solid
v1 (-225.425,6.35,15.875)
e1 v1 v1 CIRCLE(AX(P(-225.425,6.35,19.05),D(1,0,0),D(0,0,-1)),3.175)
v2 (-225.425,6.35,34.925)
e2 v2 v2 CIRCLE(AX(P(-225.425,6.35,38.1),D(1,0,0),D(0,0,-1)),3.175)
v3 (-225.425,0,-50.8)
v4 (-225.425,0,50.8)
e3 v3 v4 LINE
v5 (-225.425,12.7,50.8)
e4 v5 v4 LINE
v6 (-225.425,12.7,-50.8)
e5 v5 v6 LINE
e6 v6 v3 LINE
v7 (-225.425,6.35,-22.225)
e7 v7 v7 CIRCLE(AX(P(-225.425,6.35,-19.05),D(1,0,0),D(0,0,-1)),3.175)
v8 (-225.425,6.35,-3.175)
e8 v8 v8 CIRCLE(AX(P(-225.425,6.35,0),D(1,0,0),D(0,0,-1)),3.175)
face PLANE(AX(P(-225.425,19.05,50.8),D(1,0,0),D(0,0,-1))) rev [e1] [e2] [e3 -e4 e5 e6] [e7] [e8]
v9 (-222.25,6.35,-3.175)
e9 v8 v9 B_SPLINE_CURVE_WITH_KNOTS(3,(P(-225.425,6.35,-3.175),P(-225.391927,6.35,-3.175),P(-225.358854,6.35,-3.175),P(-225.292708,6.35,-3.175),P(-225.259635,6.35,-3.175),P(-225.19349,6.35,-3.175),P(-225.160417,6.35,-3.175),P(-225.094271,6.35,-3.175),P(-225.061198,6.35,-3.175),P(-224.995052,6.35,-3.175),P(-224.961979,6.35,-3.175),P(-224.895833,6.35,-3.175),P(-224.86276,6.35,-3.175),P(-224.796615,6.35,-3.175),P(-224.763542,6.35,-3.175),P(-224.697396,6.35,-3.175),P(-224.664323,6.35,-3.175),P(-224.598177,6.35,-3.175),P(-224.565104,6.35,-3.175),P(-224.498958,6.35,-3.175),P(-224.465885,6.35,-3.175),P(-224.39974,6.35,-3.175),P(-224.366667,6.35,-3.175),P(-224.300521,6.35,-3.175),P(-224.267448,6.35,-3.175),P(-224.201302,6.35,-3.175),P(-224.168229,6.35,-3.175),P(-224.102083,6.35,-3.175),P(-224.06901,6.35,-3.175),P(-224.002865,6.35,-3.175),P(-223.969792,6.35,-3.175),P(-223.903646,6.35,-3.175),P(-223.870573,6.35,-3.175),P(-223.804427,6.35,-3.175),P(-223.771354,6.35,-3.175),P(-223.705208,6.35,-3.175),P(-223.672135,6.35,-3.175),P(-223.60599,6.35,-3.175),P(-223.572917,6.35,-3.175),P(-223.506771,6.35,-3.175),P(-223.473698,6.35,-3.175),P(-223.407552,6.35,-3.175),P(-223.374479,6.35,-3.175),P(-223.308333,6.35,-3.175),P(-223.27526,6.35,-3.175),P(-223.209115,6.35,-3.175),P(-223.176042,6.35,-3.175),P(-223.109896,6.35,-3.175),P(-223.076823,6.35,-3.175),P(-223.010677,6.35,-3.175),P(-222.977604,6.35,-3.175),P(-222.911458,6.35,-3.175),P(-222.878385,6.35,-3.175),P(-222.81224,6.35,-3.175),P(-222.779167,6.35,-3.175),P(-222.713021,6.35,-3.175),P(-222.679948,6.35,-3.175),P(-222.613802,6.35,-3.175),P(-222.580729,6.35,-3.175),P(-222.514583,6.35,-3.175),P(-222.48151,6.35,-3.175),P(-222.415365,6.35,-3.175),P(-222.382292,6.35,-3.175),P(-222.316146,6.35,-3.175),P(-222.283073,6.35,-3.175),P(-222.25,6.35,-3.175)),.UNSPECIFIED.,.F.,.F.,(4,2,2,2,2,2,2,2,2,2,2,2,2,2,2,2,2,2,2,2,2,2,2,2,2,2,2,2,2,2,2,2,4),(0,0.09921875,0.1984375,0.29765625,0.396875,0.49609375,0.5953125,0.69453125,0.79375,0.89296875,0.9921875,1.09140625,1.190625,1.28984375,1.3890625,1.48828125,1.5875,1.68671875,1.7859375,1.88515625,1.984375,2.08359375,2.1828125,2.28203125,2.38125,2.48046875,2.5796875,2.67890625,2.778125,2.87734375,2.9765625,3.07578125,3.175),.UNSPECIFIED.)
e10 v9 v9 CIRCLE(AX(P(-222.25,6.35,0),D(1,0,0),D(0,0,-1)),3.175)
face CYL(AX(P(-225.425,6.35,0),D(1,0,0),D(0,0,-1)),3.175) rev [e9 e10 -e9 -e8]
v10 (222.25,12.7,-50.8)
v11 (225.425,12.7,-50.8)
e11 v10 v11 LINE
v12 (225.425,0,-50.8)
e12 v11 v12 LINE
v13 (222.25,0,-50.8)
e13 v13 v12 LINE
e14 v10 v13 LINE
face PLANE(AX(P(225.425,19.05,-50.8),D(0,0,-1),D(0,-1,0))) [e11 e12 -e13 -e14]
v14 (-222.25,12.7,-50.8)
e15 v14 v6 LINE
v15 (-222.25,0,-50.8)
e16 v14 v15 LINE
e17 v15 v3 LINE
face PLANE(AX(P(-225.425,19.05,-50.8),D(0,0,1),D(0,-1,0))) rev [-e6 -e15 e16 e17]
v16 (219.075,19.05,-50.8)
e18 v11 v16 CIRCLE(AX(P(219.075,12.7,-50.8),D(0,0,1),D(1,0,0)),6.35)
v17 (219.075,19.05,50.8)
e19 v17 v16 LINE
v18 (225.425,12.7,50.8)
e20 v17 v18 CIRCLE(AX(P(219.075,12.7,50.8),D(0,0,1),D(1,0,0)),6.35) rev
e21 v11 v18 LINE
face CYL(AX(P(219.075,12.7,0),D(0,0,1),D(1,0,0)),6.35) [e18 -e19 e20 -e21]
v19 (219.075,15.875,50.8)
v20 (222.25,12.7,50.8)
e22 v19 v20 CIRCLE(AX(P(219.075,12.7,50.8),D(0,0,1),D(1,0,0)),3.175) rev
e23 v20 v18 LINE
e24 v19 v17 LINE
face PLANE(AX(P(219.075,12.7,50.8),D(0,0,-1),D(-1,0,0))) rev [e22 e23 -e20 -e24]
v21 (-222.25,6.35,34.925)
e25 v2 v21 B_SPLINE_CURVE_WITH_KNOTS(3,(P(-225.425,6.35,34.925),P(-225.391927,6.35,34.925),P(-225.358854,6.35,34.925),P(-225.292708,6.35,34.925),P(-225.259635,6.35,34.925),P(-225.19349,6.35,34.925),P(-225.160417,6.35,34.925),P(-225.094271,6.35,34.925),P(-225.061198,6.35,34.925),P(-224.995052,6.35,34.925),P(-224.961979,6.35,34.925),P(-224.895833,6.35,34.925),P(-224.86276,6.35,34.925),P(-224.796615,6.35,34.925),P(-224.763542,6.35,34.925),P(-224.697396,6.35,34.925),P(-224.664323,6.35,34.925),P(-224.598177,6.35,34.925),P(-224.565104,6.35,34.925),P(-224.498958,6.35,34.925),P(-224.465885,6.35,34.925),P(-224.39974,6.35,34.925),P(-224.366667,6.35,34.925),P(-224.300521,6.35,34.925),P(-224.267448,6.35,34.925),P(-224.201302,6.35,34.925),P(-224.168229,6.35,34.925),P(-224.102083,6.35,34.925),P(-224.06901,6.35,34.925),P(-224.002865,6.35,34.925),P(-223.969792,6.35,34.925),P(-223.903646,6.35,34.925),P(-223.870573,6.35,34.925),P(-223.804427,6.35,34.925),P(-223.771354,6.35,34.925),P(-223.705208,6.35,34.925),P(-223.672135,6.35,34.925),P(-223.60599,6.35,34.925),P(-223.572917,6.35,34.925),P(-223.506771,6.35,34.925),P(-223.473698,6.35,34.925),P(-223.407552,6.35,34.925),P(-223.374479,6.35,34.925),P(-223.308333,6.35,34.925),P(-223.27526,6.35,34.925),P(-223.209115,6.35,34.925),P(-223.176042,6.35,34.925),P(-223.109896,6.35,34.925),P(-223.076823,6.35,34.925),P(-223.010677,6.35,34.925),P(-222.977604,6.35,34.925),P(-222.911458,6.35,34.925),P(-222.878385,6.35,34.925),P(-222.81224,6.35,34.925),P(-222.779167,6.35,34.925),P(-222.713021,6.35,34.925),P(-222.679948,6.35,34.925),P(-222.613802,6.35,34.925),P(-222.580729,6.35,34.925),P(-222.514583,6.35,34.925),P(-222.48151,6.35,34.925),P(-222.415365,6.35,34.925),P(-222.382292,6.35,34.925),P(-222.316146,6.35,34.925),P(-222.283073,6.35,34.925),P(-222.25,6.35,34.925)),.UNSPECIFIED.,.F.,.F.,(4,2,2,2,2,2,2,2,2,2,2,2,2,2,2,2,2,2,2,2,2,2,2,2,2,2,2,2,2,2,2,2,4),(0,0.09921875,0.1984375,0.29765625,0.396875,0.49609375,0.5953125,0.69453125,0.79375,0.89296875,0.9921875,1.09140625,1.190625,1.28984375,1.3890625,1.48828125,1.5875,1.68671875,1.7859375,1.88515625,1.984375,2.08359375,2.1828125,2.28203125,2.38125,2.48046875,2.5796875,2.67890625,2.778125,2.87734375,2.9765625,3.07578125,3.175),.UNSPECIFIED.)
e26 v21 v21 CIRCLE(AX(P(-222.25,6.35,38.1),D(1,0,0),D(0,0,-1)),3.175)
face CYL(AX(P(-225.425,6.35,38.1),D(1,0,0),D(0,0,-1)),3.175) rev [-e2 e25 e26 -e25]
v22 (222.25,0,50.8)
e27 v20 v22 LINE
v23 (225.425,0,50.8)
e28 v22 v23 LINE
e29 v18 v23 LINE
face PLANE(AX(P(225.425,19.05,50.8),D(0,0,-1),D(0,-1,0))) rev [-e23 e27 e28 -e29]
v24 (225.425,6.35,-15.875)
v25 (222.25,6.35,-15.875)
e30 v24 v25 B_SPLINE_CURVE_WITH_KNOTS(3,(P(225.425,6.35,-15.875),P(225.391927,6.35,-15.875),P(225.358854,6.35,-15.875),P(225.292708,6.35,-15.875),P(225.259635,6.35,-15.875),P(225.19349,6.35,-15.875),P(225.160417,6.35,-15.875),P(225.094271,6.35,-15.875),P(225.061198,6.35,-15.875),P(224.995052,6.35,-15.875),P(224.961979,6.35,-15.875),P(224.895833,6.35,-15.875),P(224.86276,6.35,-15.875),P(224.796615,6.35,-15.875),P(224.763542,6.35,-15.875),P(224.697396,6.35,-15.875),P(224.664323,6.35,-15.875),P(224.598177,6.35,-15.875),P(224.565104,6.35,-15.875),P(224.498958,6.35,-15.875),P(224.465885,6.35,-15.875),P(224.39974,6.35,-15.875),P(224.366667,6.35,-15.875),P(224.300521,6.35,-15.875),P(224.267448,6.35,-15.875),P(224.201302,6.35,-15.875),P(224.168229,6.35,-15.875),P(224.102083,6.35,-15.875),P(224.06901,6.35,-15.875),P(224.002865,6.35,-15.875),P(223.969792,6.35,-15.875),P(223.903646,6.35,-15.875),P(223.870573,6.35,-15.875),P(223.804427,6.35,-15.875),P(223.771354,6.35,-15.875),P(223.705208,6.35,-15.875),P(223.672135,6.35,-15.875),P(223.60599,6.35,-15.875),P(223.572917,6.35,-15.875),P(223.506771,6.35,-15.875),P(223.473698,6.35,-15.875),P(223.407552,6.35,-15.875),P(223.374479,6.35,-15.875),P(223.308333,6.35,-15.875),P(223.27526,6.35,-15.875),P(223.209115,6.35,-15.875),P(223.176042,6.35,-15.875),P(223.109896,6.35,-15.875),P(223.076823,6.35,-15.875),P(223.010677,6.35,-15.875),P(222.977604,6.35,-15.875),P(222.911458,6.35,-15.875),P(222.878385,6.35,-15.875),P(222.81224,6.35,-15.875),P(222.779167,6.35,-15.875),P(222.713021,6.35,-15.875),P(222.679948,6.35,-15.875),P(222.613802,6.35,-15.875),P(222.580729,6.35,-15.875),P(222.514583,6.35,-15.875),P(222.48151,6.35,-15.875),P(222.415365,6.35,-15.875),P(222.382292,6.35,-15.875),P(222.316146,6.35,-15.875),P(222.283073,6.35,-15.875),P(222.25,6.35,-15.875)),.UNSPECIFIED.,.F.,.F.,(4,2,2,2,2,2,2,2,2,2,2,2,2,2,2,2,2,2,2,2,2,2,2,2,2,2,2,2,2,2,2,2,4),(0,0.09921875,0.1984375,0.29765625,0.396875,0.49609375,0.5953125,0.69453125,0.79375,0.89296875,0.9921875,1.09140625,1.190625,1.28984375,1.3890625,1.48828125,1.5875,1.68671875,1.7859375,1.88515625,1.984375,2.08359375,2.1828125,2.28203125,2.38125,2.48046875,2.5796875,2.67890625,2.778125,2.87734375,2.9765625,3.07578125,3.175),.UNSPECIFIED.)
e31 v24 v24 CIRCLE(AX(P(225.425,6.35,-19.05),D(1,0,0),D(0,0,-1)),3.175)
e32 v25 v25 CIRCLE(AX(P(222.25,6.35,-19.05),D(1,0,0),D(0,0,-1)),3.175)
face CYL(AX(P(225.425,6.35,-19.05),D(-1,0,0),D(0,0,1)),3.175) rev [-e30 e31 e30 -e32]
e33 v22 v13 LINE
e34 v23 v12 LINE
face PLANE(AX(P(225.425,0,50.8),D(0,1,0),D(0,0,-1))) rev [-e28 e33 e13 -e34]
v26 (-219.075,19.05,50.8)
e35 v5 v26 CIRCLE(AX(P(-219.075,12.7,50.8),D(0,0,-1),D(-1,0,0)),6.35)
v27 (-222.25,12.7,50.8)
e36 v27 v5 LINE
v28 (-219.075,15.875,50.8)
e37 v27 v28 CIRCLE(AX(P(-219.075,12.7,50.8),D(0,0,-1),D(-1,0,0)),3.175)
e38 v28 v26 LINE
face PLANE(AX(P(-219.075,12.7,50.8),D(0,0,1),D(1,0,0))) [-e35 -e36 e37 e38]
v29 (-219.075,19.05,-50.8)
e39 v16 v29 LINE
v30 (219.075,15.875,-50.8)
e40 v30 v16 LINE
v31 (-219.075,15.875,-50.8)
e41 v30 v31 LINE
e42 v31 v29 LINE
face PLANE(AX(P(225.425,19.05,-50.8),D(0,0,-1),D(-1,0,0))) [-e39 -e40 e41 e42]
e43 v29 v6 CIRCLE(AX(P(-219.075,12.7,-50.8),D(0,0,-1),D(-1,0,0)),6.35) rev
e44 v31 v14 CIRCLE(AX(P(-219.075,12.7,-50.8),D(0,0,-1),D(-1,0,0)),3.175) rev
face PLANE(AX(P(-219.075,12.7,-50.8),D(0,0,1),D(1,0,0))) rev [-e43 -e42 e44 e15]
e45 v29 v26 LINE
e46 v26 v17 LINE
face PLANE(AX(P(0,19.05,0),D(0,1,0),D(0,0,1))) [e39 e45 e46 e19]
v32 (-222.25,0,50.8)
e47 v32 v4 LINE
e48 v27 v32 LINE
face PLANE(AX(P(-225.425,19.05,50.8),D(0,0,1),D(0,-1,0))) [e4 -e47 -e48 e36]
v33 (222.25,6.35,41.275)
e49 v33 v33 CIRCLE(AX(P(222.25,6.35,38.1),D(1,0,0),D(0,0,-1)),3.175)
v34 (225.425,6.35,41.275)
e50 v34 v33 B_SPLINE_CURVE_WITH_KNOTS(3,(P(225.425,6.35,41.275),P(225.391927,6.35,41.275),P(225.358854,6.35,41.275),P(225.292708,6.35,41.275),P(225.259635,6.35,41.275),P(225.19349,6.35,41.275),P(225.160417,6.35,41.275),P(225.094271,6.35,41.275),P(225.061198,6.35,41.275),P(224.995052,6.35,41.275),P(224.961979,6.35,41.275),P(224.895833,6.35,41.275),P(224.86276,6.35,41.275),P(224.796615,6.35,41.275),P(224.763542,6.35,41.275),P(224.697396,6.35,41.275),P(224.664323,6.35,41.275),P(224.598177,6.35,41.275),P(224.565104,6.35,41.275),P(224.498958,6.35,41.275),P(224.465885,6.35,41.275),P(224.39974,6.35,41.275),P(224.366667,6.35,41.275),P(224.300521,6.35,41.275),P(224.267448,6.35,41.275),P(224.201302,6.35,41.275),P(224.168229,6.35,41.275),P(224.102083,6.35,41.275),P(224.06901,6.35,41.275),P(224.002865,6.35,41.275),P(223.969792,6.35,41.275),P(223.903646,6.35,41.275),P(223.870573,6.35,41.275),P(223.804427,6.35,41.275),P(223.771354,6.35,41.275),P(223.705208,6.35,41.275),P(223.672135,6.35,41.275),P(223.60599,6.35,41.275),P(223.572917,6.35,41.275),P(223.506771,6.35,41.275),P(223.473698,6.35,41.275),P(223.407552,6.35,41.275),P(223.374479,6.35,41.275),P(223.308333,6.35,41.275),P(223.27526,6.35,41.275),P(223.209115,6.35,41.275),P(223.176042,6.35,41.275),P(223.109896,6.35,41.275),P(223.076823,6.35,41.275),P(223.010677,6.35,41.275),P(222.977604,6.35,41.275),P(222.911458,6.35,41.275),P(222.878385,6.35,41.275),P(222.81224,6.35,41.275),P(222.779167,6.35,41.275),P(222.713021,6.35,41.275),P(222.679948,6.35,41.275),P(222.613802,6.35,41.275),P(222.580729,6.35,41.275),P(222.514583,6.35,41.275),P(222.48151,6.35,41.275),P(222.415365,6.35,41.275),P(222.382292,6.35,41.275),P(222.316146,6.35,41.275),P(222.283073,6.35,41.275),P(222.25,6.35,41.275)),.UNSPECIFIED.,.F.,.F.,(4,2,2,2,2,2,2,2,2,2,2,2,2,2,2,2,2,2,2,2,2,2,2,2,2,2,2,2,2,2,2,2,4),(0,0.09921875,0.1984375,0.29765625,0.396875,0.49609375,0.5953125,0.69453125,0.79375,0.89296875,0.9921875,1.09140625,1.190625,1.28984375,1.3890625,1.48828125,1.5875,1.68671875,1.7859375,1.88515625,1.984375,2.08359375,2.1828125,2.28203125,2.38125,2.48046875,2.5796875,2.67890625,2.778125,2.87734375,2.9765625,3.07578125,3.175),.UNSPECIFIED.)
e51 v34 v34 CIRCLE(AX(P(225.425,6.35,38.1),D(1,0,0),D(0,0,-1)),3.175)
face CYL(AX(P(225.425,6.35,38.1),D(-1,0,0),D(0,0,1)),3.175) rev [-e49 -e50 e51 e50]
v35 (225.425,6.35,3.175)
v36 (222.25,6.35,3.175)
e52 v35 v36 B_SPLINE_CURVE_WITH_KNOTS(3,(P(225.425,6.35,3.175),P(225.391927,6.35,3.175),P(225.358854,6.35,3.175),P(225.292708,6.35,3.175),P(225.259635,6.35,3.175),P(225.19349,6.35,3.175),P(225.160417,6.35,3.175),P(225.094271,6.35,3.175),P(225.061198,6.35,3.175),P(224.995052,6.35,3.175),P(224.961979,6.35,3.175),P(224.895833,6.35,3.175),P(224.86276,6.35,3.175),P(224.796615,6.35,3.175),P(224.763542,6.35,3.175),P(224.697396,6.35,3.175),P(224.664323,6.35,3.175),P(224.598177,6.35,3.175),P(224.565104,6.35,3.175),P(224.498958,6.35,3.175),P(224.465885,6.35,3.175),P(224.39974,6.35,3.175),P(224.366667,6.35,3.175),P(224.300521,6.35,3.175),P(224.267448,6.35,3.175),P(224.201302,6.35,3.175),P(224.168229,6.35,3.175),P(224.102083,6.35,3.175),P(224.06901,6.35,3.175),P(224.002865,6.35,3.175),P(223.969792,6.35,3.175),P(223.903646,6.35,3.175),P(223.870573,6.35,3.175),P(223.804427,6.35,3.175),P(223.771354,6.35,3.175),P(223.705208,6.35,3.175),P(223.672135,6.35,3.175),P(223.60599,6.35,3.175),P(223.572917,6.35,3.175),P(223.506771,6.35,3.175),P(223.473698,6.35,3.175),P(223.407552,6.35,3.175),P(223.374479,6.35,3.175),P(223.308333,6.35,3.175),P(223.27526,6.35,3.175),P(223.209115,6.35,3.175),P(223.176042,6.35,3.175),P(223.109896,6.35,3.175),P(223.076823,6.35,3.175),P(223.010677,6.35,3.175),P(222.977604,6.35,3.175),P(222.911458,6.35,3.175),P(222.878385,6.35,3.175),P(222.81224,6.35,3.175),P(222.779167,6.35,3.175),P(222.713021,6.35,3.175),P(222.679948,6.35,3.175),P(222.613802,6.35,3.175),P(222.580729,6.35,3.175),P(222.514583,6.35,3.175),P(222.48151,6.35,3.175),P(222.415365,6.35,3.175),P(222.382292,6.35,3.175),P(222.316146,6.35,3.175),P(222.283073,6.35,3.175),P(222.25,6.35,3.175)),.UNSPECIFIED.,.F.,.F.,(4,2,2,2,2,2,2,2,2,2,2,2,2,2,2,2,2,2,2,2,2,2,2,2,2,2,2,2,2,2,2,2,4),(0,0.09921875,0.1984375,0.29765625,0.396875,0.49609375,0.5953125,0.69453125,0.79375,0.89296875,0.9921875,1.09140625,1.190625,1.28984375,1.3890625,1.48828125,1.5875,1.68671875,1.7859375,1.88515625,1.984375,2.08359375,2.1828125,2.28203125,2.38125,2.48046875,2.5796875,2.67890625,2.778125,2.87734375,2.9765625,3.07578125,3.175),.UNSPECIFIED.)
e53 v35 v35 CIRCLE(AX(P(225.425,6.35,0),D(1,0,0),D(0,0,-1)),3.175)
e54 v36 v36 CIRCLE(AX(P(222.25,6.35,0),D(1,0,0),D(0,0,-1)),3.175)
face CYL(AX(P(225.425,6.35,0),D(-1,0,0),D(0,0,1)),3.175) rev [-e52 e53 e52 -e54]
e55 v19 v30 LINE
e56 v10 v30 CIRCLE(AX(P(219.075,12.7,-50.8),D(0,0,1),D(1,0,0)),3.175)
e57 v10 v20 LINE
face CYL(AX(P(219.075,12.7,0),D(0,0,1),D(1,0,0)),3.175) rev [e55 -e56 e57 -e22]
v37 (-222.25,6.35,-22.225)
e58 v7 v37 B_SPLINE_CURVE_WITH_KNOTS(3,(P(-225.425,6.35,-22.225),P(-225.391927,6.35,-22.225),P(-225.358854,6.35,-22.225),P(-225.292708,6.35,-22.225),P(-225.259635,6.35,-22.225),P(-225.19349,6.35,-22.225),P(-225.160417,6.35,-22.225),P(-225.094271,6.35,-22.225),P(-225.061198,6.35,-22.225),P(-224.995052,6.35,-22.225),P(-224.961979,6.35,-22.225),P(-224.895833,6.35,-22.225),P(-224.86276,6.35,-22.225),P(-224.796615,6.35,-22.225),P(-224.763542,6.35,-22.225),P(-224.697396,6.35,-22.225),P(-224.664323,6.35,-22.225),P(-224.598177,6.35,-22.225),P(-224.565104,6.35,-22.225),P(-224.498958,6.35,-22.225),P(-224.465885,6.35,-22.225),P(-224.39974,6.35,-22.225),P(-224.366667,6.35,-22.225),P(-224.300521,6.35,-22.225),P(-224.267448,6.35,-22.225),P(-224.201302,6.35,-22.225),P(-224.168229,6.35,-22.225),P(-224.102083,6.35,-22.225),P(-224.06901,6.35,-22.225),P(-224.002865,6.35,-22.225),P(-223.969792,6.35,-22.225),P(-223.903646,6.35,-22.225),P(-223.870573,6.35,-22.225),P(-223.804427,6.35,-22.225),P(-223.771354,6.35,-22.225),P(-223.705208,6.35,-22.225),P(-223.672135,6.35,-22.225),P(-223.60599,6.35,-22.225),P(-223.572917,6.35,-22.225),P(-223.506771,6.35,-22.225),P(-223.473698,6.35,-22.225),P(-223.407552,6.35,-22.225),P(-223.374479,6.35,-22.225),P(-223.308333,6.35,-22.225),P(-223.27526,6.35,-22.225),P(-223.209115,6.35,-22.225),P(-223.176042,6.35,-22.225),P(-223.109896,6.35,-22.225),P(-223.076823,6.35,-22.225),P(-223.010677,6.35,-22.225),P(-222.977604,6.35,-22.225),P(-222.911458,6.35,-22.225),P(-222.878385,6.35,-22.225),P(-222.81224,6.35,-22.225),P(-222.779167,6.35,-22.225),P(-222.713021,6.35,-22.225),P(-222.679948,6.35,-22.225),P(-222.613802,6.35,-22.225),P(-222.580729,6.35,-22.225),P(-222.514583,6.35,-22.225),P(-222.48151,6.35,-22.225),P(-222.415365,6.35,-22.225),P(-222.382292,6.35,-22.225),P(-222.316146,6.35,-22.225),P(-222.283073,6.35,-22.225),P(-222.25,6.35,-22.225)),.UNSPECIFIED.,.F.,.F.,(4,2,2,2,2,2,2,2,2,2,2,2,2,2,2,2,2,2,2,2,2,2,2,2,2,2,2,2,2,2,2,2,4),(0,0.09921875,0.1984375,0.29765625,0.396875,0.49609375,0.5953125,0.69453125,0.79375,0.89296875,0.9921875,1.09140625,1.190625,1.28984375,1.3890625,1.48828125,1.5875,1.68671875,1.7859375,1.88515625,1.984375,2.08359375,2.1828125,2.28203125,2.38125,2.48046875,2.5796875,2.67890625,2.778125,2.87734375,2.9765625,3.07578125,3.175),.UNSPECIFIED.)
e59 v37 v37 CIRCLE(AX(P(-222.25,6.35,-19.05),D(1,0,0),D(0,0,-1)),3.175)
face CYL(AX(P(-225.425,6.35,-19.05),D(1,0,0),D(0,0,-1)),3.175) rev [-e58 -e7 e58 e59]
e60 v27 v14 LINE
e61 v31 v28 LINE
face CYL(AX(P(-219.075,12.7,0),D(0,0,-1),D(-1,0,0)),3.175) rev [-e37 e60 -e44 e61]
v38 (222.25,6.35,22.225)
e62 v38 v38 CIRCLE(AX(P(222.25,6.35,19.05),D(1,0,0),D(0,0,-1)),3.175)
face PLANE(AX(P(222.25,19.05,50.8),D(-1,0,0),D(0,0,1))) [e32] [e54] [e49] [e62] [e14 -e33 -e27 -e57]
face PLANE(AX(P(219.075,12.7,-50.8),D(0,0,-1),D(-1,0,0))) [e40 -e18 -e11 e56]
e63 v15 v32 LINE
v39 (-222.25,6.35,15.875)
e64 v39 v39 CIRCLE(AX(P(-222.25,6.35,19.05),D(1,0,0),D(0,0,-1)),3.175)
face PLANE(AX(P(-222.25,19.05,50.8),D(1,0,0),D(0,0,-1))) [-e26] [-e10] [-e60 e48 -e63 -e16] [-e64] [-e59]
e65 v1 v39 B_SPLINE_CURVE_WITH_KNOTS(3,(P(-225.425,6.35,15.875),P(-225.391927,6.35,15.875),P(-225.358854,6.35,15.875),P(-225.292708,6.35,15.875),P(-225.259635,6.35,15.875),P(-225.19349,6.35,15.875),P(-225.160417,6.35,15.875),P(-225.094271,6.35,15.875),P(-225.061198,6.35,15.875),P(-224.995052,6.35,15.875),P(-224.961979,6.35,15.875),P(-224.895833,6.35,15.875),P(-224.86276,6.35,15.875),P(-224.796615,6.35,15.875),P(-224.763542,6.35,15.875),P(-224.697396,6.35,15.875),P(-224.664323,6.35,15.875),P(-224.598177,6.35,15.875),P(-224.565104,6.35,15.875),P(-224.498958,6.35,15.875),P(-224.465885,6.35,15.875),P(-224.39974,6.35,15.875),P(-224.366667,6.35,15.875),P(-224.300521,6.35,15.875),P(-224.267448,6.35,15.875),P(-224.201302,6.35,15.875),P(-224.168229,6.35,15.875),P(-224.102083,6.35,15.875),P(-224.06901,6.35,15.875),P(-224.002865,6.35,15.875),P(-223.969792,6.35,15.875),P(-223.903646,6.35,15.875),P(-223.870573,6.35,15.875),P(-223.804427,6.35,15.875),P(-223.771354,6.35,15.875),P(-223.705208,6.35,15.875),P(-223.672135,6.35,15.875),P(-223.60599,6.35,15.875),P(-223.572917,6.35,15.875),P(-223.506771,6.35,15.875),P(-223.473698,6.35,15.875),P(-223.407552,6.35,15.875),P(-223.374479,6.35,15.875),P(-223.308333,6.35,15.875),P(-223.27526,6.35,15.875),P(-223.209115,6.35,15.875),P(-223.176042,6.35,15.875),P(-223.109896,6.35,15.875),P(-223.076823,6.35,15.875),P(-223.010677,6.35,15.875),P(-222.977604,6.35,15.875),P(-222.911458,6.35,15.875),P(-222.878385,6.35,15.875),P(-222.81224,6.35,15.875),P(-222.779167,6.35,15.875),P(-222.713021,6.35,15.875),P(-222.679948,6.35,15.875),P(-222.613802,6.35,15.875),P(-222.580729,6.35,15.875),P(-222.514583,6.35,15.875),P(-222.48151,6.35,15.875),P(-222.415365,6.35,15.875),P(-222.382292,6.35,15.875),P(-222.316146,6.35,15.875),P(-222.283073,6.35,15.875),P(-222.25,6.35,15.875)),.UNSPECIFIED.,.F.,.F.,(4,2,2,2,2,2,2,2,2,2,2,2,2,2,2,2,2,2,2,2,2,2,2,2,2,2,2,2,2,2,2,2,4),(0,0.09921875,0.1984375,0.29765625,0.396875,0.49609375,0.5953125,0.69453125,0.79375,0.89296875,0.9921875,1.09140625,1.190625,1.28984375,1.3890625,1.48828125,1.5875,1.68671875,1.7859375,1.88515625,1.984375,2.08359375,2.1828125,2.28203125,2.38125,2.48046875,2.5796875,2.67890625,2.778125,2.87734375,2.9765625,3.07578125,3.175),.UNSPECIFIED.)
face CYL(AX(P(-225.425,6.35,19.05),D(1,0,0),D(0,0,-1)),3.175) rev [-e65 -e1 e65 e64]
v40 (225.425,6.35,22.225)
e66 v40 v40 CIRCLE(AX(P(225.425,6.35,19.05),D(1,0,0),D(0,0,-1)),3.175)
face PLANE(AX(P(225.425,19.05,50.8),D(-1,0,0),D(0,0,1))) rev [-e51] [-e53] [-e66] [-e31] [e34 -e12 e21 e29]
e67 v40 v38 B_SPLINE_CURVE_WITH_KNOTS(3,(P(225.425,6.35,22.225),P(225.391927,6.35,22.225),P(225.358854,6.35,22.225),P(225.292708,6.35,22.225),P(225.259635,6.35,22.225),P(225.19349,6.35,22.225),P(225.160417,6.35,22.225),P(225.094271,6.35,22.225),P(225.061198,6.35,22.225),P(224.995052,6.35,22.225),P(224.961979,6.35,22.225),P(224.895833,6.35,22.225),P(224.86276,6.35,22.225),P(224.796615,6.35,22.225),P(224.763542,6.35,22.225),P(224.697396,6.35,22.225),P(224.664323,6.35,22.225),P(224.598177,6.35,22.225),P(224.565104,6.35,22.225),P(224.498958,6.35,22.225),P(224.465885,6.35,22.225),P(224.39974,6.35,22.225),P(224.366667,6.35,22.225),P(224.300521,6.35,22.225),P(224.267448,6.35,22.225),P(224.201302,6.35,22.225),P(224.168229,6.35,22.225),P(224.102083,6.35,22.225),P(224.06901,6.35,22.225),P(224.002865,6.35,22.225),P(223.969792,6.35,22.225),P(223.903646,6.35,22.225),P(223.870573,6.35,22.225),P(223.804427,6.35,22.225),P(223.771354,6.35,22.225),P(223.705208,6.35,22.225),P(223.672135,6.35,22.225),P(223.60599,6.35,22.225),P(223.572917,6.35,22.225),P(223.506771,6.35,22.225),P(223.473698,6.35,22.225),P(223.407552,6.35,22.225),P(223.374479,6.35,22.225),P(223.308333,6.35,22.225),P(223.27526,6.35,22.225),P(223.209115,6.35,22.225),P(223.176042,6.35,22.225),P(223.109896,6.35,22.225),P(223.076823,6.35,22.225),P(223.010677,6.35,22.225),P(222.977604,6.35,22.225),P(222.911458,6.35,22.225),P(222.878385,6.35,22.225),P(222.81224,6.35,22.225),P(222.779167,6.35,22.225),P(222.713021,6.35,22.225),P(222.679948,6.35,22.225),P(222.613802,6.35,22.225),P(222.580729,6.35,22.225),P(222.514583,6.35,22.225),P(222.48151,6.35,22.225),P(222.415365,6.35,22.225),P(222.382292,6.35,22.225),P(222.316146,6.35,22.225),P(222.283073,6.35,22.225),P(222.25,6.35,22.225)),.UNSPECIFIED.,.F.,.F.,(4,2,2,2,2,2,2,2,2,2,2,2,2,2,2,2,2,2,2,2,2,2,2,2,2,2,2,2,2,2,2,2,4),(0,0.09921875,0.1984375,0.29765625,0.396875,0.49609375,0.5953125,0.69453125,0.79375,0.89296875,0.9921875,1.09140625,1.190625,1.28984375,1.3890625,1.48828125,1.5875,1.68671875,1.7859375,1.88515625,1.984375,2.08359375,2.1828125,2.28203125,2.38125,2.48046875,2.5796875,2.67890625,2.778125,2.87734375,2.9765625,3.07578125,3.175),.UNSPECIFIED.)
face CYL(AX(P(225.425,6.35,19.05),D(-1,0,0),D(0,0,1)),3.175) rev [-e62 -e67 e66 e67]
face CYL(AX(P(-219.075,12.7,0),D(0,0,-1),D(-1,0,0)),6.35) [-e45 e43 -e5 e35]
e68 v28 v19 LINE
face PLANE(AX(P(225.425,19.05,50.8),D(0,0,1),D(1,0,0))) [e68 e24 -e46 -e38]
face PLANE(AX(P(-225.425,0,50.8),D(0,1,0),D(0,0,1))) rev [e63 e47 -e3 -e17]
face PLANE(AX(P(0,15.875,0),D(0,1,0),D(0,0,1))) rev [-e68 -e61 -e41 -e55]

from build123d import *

# Parameters (mm, degrees)
SKETCH1_W            = 450.85
SKETCH1_H            = 101.6
BOSS_EXTRUDE1_DEPTH  = 19.05
SKETCH2_R            = 3.175
CUT_EXTRUDE1_DEPTH   = 455.102703141
CONVERT_SOLID2_START = -50.8
CONVERT_SOLID2_DEPTH = 101.6


# Read off the part's stored shape, not the designer's step: Convert-Solid2
with BuildPart() as part:
    # Sketch1 → Boss-Extrude1 (new body)
    with BuildSketch(Plane(origin=(0, 0, 0), x_dir=(1, 0, 0), z_dir=(0, 1, 0))):
        Rectangle(SKETCH1_W, SKETCH1_H)
    extrude(amount=BOSS_EXTRUDE1_DEPTH)

    # Sketch2 → Cut-Extrude1 (cut, through all)
    with BuildSketch(Plane(origin=(225.425, 0, 0), x_dir=(0, 0, -1), z_dir=(1, 0, 0))):
        with Locations((-38.1, 6.35)):
            Circle(SKETCH2_R)
        with Locations((-19.05, 6.35)):
            Circle(SKETCH2_R)
        with Locations((0, 6.35)):
            Circle(SKETCH2_R)
        with Locations((19.05, 6.35)):
            Circle(SKETCH2_R)
    extrude(amount=-CUT_EXTRUDE1_DEPTH, mode=Mode.SUBTRACT)

    # Convert-Solid2 outline → Convert-Solid2 (cut)
    with BuildSketch(Plane.XY.offset(CONVERT_SOLID2_START)):
        with BuildLine():
            ThreePointArc((219.075, 19.05), (223.565128061, 17.190128061), (225.425, 12.7))
            Line((225.425, 12.7), (225.425, 19.05))
            Line((225.425, 19.05), (219.075, 19.05))
        make_face()
        with BuildLine():
            ThreePointArc((-225.425, 12.7), (-223.565128061, 17.190128061), (-219.075, 19.05))
            Line((-219.075, 19.05), (-225.425, 19.05))
            Line((-225.425, 19.05), (-225.425, 12.7))
        make_face()
        with BuildLine():
            Line((-222.25, 0), (222.25, 0))
            Line((222.25, 0), (222.25, 12.7))
            ThreePointArc((222.25, 12.7), (221.32006403, 14.94506403), (219.075, 15.875))
            Line((219.075, 15.875), (-219.075, 15.875))
            ThreePointArc((-219.075, 15.875), (-221.32006403, 14.94506403), (-222.25, 12.7))
            Line((-222.25, 12.7), (-222.25, 0))
        make_face()
    extrude(amount=CONVERT_SOLID2_DEPTH, mode=Mode.SUBTRACT)


solid = part.part
